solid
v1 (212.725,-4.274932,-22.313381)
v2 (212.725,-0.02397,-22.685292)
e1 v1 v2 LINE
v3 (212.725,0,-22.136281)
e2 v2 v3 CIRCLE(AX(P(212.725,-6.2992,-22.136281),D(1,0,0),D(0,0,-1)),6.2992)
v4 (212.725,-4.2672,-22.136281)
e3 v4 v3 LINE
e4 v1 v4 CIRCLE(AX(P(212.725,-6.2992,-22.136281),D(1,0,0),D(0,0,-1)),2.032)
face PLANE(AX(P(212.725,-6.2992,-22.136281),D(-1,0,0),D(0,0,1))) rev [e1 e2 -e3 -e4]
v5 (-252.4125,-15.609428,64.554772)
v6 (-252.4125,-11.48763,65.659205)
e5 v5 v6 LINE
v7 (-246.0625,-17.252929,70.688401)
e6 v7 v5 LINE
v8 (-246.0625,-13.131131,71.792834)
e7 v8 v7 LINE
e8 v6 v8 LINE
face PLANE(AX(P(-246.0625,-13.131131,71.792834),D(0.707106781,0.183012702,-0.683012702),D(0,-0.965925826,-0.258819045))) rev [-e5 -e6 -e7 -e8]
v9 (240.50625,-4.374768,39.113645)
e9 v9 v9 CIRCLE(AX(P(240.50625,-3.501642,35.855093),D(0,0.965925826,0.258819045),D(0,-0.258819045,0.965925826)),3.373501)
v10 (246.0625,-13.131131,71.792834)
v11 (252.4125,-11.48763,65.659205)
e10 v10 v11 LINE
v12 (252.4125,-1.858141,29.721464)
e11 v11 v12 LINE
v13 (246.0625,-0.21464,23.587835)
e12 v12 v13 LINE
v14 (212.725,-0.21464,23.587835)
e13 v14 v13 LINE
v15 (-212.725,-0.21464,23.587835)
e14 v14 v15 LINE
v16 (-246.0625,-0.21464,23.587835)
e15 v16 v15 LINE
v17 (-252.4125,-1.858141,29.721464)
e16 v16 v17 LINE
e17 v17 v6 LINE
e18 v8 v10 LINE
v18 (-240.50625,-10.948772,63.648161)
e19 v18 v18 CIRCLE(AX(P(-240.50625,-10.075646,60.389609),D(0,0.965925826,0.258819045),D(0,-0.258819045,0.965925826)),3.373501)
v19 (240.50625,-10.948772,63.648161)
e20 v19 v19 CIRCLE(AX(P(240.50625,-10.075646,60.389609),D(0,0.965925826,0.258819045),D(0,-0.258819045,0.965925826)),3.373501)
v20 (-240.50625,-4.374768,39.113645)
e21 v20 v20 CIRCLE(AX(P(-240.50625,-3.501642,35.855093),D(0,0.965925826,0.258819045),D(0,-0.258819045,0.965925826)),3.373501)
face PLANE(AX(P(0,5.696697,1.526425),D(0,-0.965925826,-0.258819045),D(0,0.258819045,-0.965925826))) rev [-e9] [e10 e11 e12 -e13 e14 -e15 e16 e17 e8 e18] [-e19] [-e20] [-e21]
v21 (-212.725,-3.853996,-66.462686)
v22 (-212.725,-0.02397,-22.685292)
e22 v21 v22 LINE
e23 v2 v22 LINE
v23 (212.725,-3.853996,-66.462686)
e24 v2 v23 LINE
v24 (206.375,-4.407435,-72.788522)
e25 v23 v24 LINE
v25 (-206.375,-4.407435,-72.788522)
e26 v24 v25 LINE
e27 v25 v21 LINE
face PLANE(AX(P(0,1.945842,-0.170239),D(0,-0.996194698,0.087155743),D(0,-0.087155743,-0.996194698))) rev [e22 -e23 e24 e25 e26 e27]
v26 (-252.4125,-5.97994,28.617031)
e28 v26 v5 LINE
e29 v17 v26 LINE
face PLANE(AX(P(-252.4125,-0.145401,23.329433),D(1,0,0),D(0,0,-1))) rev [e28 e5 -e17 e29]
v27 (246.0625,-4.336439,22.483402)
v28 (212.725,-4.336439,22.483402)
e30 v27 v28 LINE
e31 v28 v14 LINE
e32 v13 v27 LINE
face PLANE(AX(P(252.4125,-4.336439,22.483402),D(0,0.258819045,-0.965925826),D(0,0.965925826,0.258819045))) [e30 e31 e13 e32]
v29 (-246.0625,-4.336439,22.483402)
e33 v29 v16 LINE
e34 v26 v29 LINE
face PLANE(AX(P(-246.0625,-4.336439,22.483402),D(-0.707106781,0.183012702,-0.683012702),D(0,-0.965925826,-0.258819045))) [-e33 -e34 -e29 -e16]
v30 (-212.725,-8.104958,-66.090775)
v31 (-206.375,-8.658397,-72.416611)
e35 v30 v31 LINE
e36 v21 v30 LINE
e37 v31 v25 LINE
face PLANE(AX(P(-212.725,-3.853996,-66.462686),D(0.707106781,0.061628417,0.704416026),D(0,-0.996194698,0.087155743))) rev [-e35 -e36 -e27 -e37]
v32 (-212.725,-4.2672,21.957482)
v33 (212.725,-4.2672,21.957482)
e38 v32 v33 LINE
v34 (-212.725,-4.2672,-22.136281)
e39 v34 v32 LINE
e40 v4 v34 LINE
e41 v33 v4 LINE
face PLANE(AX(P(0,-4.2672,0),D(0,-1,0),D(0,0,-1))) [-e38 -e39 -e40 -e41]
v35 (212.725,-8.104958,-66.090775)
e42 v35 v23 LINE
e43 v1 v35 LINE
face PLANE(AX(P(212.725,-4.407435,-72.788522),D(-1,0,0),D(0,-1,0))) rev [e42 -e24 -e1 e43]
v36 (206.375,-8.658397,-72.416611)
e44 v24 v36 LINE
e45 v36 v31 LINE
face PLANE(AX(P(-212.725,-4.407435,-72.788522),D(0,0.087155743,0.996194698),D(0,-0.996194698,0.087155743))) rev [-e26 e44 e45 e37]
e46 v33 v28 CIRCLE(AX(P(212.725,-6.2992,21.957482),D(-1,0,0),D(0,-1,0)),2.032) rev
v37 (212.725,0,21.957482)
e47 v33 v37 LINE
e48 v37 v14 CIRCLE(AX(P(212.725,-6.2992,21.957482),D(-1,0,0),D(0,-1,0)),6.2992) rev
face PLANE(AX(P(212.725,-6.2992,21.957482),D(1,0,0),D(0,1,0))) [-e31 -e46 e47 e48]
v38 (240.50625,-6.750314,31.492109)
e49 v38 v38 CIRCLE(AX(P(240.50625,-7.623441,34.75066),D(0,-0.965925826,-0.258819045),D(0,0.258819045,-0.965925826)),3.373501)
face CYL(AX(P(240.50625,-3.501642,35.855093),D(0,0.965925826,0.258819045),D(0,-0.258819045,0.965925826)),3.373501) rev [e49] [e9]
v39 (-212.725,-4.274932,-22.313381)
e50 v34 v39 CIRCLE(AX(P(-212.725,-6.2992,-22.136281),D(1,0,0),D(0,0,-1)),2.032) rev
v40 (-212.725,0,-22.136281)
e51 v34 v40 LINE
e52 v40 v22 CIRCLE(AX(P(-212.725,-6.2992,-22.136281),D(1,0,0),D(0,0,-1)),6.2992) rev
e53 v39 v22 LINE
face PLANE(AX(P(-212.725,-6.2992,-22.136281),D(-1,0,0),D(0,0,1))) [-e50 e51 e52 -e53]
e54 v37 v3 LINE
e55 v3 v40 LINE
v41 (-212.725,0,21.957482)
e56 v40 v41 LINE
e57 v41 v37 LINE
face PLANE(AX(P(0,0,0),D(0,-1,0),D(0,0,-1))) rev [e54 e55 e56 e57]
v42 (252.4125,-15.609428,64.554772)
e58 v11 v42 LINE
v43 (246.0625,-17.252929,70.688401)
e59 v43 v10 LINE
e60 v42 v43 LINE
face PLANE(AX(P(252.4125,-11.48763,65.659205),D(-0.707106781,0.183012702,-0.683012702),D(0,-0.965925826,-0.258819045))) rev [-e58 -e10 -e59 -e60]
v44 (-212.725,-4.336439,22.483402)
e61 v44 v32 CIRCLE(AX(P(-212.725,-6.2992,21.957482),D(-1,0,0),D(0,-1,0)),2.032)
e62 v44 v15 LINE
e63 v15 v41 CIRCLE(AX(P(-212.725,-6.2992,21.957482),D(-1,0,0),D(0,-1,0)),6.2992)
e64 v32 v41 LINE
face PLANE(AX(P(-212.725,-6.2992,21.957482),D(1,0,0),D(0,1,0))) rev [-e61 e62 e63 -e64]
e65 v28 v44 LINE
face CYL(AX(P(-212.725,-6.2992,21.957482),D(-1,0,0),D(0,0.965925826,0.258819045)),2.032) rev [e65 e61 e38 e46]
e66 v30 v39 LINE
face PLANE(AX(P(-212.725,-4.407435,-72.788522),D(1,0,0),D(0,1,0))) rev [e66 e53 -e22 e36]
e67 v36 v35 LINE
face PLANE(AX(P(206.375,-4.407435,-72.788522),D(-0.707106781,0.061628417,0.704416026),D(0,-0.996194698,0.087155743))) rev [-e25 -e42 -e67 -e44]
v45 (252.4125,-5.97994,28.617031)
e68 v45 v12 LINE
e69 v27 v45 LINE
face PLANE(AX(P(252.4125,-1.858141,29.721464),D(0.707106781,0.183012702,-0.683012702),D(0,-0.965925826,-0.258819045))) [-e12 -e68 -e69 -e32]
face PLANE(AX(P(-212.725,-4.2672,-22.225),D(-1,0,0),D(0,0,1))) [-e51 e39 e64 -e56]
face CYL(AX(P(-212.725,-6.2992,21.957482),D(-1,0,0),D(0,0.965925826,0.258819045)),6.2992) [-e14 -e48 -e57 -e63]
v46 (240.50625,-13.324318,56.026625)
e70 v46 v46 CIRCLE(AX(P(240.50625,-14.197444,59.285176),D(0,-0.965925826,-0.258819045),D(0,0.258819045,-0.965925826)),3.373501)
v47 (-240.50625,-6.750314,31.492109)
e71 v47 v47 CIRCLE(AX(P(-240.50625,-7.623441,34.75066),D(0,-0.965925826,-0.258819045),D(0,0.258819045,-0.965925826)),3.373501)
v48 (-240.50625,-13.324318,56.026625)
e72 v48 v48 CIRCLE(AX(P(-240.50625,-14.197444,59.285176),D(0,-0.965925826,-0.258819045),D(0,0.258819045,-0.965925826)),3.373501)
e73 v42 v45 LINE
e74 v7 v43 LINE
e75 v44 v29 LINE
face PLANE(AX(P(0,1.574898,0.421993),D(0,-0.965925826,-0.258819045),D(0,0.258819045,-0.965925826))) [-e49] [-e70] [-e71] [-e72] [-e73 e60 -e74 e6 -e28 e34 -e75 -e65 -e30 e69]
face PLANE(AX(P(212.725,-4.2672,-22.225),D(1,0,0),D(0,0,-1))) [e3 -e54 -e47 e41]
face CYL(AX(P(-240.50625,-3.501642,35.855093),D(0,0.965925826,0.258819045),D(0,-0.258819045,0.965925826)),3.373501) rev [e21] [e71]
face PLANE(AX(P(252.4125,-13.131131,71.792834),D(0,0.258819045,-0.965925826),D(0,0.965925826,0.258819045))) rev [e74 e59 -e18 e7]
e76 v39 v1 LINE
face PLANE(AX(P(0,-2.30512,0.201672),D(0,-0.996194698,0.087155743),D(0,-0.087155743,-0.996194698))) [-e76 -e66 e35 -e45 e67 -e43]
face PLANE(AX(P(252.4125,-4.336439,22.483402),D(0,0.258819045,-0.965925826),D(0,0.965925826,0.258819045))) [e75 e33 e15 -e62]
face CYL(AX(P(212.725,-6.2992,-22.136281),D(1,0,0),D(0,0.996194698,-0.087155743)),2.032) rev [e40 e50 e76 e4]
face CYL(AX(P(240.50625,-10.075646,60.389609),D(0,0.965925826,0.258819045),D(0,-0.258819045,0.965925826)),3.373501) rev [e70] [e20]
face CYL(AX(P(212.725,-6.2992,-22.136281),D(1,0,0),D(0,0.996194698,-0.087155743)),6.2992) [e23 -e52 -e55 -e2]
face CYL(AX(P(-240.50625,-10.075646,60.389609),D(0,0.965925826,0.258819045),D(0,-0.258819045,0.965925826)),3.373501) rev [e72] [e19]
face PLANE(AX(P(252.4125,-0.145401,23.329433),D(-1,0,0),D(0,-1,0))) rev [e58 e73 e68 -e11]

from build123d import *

# Parameters (mm, degrees)
SKETCH1_W                        = 425.45
SKETCH1_H                        = 44.45
BASE_FLANGE1_DEPTH               = 4.2672
EDGE_FLANGE1_STRIP_CUT_DEPTH     = 425.45
EDGE_FLANGE1_DEPTH               = 425.45
EDGE_FLANGE1_START               = 4.2672
EDGE_FLANGE1_PROFILE_W           = 504.825
EDGE_FLANGE1_PROFILE_H           = 49.905487105
EDGE_FLANGE1_FLAT_DEPTH          = 4.2672
EDGE_FLANGE2_STRIP_CUT_DEPTH     = 425.45
EDGE_FLANGE2_DEPTH               = 425.45
CHAMFER1_SIZE                    = 6.35
F_17_64_0_26563_DIAMETER_HOLE1_D = 6.747002


# Sheet-metal steps are written as plain solids
with BuildPart() as part:
    # Sketch1 → Base-Flange1 (new body)
    with BuildSketch(Plane(origin=(0, 0, 0), x_dir=(1, 0, 0), z_dir=(0, 1, 0))):
        Rectangle(SKETCH1_W, SKETCH1_H)
    extrude(amount=-BASE_FLANGE1_DEPTH)

    # Edge-Flange1 strip (across the edge) → Edge-Flange1 strip cut (cut)
    with BuildSketch(Plane(origin=(212.725, -4.2672, 22.225), x_dir=(0, -0.96592582628907, -0.2588190451025146), z_dir=(-1, 0, 0))):
        Polygon((-9.522131081, 19.049882248), (-4.052559965, -1.362835054), (0.069238721, -0.258402425), (-5.400332395, 20.154314877), align=None)
    extrude(amount=EDGE_FLANGE1_STRIP_CUT_DEPTH, mode=Mode.SUBTRACT)

    # Edge-Flange1 bend section (across the edge) → Edge-Flange1 (add)
    with BuildSketch(Plane(origin=(212.725, -4.2672, 22.225), x_dir=(0, -0.96592582628907, -0.2588190451025146), z_dir=(-1, 0, 0))):
        with BuildLine():
            Line((-4.2672, 0.267517875), (0, 0.267517875))
            ThreePointArc((0, 0.267517875), (0.017384042, 0.002288653), (0.069238721, -0.258402425))
            Line((0.069238721, -0.258402425), (-4.052559965, -1.362835054))
            ThreePointArc((-4.052559965, -1.362835054), (-4.213309471, -0.554692715), (-4.2672, 0.267517875))
        make_face()
    extrude(amount=EDGE_FLANGE1_DEPTH)

    # Edge-Flange1 profile (on flange) → Edge-Flange1 flat (add)
    with BuildSketch(Plane(origin=(0, -4.2672, 22.225), x_dir=(-1, 0, 0), z_dir=(0, 0.96592582628907, 0.2588190451025146)).offset(EDGE_FLANGE1_START)):
        with Locations((0, 25.220261428)):
            Rectangle(EDGE_FLANGE1_PROFILE_W, EDGE_FLANGE1_PROFILE_H)
    extrude(amount=-EDGE_FLANGE1_FLAT_DEPTH)

    # Edge-Flange2 strip (across the edge) → Edge-Flange2 strip cut (cut)
    with BuildSketch(Plane(origin=(-212.725, -4.2672, -22.225), x_dir=(0, -0.9961946980917461, 0.08715574274765156), z_dir=(1, 0, 0))):
        Polygon((-6.085074523, 20.592090897), (-4.243229642, -0.460292419), (0.007732373, -0.088381433), (-1.834112507, 20.964001883), align=None)
    extrude(amount=EDGE_FLANGE2_STRIP_CUT_DEPTH, mode=Mode.SUBTRACT)

    # Edge-Flange2 section (across the edge) → Edge-Flange2 (add)
    with BuildSketch(Plane(origin=(-212.725, -4.2672, -22.225), x_dir=(0, -0.9961946980917461, 0.08715574274765156), z_dir=(1, 0, 0))):
        with BuildLine():
            Line((-4.2672, 0.088719036), (-4.2672, 50.38333524))
            Line((-4.2672, 50.38333524), (0, 50.38333524))
            Line((0, 50.38333524), (0, 0.088719036))
            ThreePointArc((0, 0.088719036), (0.001934014, 8.4441e-05), (0.007732373, -0.088381433))
            Line((0.007732373, -0.088381433), (-4.243229642, -0.460292419))
            ThreePointArc((-4.243229642, -0.460292419), (-4.261204557, -0.186048209), (-4.2672, 0.088719036))
        make_face()
    extrude(amount=EDGE_FLANGE2_DEPTH)

    # Chamfer1
    chamfer1_edges = [part.edges().sort_by_distance(p)[0] for p in [
        (-252.4125, -2.275539378, 23.035618739),
        (252.4125, -2.275539378, 23.035618739),
        (252.4125, -15.192029896, 71.240617608),
        (-252.4125, -15.192029896, 71.240617608),
        (-212.725, -6.532915997, -72.602566931),
        (212.725, -6.532915997, -72.602566931),
    ]]
    chamfer(chamfer1_edges, length=CHAMFER1_SIZE)

    # 17/64 (0.26563) Diameter Hole1 (through all)
    with Locations(Plane(origin=(0, 5.696696884, 1.52642533), x_dir=(1, 0, 0), z_dir=(0, 0.96592582628907, 0.2588190451025147))):
        with Locations((-240.50625, -35.539651994), (-240.50625, -60.939651994), (240.50625, -60.939651994), (240.50625, -35.539651994)):
            Hole(F_17_64_0_26563_DIAMETER_HOLE1_D / 2)


solid = part.part
